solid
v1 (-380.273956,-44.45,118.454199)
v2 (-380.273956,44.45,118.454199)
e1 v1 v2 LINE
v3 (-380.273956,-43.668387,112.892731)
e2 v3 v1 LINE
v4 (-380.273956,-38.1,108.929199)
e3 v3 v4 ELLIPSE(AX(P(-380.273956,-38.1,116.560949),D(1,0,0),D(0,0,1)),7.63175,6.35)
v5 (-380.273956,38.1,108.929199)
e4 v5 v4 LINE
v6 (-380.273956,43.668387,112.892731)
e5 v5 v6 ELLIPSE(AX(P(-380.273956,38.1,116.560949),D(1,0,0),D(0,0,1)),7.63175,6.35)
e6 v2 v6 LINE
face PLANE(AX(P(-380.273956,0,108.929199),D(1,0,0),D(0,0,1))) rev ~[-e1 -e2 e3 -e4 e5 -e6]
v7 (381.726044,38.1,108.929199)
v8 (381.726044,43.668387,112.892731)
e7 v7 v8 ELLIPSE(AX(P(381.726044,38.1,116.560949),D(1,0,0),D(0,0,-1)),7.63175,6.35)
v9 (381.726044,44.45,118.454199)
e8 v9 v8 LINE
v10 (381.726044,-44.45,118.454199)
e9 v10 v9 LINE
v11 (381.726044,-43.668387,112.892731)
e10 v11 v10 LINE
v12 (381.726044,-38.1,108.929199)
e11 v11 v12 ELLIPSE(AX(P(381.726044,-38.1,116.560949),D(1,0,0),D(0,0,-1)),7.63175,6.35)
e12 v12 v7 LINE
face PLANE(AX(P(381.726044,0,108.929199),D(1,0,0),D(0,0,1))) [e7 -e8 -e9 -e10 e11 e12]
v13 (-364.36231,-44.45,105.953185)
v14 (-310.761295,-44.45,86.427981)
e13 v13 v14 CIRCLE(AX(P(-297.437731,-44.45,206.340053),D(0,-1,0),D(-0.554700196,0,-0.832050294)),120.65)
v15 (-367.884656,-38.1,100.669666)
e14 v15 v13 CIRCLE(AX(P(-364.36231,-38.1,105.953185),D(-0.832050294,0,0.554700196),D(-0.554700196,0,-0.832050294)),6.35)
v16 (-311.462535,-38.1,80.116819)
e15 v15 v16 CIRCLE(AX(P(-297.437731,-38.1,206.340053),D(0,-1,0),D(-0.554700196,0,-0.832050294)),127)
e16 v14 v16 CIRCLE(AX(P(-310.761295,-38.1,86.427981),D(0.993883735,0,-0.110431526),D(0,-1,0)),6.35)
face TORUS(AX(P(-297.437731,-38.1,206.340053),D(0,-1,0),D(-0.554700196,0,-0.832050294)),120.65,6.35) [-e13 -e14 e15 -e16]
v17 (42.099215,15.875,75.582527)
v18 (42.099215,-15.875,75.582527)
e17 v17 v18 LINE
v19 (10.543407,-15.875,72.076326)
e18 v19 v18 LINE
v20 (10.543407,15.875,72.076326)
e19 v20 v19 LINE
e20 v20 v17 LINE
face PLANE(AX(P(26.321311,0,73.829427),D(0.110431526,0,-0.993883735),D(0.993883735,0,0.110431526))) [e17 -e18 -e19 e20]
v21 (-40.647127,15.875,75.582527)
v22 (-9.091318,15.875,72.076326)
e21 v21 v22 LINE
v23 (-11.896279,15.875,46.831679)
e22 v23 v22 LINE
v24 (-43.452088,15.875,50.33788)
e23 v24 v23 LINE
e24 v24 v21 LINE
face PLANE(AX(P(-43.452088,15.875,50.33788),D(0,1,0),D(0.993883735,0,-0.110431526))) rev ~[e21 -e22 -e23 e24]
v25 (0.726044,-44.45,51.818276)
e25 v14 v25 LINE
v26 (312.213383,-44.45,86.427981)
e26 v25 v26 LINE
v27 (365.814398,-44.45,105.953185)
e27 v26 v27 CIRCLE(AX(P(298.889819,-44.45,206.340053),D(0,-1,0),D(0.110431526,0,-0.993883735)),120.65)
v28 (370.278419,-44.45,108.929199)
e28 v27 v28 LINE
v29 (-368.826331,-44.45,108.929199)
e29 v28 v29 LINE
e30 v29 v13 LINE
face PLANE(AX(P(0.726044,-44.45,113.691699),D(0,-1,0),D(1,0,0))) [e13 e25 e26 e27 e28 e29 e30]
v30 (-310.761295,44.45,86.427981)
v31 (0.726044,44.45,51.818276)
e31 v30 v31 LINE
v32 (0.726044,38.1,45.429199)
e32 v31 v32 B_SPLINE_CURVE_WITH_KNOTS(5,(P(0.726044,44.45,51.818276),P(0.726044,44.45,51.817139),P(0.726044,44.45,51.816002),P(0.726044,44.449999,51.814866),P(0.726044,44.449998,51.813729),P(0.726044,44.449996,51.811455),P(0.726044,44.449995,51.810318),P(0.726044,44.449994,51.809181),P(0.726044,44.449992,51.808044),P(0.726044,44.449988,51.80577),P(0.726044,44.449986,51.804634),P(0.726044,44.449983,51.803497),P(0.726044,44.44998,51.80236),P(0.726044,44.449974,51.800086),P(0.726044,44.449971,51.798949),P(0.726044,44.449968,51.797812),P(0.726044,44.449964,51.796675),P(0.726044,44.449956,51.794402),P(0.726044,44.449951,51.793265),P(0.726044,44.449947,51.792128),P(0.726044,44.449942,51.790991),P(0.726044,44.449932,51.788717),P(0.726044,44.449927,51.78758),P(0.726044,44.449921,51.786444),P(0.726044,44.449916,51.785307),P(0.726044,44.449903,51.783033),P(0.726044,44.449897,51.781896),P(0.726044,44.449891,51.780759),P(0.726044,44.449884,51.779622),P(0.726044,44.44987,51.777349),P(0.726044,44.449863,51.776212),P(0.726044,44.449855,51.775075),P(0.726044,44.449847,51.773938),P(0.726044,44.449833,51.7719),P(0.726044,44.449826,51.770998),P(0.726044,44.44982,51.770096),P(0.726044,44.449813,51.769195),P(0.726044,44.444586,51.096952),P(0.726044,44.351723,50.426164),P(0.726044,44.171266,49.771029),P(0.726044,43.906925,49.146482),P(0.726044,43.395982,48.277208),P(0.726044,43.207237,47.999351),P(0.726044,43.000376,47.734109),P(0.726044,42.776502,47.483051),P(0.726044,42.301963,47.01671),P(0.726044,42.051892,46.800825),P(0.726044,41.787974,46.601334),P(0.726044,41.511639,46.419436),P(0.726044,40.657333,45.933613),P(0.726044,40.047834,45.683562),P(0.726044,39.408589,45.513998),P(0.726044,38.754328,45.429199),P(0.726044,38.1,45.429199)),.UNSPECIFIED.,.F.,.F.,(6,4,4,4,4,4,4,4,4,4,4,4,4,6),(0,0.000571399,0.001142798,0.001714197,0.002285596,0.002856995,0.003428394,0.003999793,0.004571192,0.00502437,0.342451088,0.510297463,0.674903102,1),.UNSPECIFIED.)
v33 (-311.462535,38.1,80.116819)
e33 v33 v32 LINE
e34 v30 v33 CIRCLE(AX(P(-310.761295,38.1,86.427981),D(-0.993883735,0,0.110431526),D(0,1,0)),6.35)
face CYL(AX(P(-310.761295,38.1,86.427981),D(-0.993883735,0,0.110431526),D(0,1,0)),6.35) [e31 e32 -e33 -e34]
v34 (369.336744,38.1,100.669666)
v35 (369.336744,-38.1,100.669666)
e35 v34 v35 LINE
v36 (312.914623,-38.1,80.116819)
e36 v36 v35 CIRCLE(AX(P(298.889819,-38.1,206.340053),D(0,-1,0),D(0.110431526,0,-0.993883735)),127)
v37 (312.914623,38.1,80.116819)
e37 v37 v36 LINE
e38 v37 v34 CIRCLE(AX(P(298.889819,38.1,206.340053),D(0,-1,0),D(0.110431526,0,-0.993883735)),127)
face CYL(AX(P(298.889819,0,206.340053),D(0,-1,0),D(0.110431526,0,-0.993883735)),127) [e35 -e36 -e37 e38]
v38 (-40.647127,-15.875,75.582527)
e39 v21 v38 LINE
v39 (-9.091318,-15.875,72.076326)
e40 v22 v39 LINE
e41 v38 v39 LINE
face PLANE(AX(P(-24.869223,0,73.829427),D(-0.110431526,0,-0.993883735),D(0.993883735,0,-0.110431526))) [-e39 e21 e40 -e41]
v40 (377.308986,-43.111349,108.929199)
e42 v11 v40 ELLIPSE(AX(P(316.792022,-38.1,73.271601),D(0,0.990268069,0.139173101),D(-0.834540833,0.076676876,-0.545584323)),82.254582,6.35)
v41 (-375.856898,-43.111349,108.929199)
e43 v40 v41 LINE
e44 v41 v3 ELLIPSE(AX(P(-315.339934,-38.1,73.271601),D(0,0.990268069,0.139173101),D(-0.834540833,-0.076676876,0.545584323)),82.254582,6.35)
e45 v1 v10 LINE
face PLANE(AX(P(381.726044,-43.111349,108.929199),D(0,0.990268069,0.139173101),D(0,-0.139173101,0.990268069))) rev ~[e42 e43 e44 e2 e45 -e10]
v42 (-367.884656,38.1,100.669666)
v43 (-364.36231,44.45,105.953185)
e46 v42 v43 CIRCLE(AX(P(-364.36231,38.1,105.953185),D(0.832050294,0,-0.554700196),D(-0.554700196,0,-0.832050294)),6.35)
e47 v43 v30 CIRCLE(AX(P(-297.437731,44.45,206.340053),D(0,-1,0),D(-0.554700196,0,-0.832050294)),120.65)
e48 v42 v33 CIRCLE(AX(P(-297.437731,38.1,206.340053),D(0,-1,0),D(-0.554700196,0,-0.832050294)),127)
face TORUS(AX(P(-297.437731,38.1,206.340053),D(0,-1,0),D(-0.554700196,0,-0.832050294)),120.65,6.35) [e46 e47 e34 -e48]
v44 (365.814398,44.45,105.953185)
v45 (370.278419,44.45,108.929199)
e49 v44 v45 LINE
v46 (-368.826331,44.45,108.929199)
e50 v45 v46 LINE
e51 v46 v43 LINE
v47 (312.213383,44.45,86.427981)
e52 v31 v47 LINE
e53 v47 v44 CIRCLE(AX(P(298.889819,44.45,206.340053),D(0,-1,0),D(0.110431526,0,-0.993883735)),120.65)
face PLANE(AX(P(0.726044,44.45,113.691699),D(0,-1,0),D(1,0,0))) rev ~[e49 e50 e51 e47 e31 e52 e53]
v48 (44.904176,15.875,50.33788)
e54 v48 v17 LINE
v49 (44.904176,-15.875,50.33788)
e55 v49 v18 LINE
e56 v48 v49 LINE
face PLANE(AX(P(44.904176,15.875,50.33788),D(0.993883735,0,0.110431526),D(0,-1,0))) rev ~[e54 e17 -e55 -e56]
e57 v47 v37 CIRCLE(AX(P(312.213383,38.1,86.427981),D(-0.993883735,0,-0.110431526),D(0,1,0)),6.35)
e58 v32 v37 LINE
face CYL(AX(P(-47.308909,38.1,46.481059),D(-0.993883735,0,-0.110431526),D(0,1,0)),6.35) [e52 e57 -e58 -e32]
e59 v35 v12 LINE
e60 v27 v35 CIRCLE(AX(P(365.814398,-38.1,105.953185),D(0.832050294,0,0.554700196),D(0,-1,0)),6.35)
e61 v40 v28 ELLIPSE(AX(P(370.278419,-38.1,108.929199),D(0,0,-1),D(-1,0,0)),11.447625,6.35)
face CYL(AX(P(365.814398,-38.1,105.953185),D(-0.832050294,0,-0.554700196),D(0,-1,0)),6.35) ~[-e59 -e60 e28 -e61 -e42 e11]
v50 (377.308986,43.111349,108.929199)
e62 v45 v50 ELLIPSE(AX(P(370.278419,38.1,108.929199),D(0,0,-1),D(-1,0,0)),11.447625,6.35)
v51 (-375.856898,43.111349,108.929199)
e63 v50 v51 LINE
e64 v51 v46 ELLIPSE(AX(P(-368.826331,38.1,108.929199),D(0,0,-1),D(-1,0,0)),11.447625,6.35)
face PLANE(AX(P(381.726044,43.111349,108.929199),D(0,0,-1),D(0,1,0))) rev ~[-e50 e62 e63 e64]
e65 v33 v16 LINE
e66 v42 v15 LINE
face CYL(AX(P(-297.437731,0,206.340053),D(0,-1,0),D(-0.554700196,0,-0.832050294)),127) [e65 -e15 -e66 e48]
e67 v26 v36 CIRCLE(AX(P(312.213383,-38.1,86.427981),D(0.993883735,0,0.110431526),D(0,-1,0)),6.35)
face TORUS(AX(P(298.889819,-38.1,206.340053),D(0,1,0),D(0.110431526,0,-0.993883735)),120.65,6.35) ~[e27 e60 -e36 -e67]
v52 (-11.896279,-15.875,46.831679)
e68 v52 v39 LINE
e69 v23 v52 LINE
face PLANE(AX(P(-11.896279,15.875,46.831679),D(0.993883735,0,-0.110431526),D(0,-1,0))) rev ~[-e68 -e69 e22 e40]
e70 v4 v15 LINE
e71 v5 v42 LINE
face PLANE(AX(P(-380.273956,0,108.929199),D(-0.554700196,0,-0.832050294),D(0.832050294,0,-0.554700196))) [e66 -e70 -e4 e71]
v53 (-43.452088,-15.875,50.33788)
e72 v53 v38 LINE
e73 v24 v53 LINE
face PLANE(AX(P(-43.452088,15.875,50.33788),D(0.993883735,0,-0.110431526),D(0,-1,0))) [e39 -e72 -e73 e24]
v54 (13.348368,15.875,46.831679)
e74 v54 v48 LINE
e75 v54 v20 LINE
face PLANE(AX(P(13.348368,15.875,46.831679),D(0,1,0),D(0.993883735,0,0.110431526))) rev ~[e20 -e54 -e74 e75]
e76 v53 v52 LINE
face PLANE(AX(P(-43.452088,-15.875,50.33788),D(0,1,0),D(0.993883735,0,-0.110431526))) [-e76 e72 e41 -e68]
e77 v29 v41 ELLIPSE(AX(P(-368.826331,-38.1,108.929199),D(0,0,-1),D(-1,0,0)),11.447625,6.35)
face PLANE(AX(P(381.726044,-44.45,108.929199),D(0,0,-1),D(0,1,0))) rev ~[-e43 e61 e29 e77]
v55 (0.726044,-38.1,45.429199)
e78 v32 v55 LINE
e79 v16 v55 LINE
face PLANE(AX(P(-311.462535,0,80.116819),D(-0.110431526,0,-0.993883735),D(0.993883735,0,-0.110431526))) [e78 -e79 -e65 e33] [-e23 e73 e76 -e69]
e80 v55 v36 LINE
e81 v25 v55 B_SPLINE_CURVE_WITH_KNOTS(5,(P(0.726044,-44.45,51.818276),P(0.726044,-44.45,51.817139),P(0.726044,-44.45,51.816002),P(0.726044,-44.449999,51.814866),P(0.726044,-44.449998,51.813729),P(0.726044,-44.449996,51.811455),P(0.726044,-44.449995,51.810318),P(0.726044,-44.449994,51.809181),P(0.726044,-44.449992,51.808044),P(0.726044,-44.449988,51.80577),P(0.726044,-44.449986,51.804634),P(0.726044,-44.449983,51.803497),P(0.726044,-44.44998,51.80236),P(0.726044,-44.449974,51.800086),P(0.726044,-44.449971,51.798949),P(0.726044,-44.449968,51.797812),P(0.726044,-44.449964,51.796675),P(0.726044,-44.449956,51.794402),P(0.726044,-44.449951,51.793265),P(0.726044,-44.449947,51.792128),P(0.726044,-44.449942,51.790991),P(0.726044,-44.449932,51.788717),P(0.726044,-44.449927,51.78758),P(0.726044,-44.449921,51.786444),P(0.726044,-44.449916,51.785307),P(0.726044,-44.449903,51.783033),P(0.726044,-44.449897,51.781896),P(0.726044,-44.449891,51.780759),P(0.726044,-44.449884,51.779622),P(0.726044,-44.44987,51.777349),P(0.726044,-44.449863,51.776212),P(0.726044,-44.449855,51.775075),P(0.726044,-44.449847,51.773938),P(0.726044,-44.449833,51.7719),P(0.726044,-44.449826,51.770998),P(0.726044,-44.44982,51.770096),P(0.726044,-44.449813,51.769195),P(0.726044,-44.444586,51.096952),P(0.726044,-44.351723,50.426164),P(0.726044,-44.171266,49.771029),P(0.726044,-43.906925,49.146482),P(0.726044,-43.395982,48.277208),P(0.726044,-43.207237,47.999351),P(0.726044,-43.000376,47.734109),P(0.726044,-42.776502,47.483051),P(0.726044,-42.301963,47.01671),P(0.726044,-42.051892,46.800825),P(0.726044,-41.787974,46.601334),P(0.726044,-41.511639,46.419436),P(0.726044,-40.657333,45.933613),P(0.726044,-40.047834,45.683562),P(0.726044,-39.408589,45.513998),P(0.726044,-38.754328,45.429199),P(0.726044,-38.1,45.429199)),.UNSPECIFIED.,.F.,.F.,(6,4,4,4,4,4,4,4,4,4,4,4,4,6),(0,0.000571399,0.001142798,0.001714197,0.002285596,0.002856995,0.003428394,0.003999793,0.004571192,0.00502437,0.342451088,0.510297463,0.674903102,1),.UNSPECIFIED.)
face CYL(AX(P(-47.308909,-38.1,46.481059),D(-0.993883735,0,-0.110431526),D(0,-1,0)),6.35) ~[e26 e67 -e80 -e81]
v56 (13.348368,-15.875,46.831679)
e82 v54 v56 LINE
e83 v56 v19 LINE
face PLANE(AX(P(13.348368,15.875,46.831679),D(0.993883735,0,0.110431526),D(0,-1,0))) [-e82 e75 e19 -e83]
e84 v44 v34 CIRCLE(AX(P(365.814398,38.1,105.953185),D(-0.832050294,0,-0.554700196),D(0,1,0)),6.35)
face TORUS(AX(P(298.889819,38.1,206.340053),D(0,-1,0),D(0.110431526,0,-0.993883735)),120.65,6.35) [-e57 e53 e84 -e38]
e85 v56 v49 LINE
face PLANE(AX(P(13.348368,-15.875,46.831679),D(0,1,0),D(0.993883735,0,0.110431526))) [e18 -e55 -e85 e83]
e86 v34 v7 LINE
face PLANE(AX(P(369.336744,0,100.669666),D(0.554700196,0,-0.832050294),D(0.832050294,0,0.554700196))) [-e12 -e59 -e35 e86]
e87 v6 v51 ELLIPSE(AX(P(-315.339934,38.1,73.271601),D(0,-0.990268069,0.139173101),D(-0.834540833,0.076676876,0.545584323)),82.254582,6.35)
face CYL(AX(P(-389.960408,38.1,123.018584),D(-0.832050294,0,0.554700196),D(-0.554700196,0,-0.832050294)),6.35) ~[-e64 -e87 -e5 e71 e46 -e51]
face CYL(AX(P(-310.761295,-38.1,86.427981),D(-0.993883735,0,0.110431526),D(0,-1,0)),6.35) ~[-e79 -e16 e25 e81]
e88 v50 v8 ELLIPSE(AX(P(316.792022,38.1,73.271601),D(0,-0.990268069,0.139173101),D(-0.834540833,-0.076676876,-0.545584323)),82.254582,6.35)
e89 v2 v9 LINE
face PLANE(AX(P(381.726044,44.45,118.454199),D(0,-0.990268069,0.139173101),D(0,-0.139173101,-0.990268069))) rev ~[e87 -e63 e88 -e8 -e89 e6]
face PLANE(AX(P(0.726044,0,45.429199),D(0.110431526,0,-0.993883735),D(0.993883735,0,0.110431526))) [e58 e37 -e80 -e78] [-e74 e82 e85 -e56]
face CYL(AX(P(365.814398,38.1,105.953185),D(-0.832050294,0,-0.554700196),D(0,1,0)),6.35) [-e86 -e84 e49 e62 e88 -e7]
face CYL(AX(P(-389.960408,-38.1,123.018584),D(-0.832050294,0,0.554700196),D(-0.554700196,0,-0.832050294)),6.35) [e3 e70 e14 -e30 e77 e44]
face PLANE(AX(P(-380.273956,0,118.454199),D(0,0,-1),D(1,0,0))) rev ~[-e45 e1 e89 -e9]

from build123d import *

# Parameters (mm, degrees)
F0_W          = 762
F0_H          = 9.525
F1_DEPTH      = 44.45
F2_W          = 31.75
F2_H          = 31.75
F3_DEPTH      = 25.4
F4_W          = 31.75
F4_H          = 31.75
F5_DEPTH      = 25.4
F7_DEPTH      = 762.001
F9_DEPTH      = 762.001
F10_T1_DEPTH  = 361.7347577498
F10_T3_DEPTH  = 361.7347577498
F10_T5_DEPTH  = 30.7650851852
F10_T7_DEPTH  = 30.7650851852
F10_T10_ANGLE = 27.3498757801
F10_T12_ANGLE = 27.3498757801
F10_T14_ANGLE = 27.3498757801
F10_T16_ANGLE = 27.3498757801


# Not quite as in the source:
# - a fillet or chamfer that OpenCascade refuses, or shapes differently, is made with other operations: its cross-section is extruded or revolved along the edge and cut away or added
# - a feature names something its author has since deleted; it is built from what else it names


with BuildPart() as f1:
    # F0 (on Front) → F1 (new body, symmetric)
    with BuildSketch(Plane.XZ):
        with Locations((0.726044178, 113.6916989031)):
            Rectangle(F0_W, F0_H)
        with BuildLine():
            Line((381.726044178, 108.9291989031), (-380.273955822, 108.9291989031))
            Line((-380.273955822, 108.9291989031), (-367.8846560609, 100.669665729))
            ThreePointArc((-367.8846560609, 100.669665729), (-340.9058012367, 87.0105643735), (-311.4625349518, 80.1168188064))
            Line((-311.4625349518, 80.1168188064), (0.726044178, 45.4291989031))
            Line((0.726044178, 45.4291989031), (31.5534211464, 48.8544630107))
            Line((31.5534211464, 48.8544630107), (312.9146233078, 80.1168188064))
            ThreePointArc((312.9146233078, 80.1168188064), (342.3578895927, 87.0105643735), (369.3367444169, 100.669665729))
            Line((369.3367444169, 100.669665729), (381.726044178, 108.9291989031))
        make_face()
    extrude(amount=F1_DEPTH, both=True)

    # F2 (on face) → F3 (cut)
    with BuildSketch(Plane(origin=(4.9949857842, 0, 44.954872058), x_dir=(0.9938837347, 0, -0.1104315261), z_dir=(-0.1104315261, 0, -0.9938837347))):
        with Locations((-32.870212264, 0)):
            Rectangle(F2_W, F2_H)
    extrude(amount=-F3_DEPTH, mode=Mode.SUBTRACT)

    # F4 (on face) → F5 (cut)
    with BuildSketch(Plane(origin=(-4.9772773896, 0, 44.7954965067), x_dir=(0.9938837347, 0, 0.1104315261), z_dir=(0.1104315261, 0, -0.9938837347))):
        with Locations((34.3134192624, 0)):
            Rectangle(F4_W, F4_H)
    extrude(amount=-F5_DEPTH, mode=Mode.SUBTRACT)

    # F6 (on face) → F7 (cut, through all)
    with BuildSketch(Plane.YZ.offset(381.726044178)):
        Polygon((-43.1113485495, 108.9291989031), (-44.45, 118.4541989031), (-44.45, 108.9291989031), align=None)
    extrude(amount=-F7_DEPTH, mode=Mode.SUBTRACT)

    # F8 (on face) → F9 (cut, through all)
    with BuildSketch(Plane.YZ.offset(381.726044178)):
        Polygon((44.45, 108.9291989031), (44.45, 118.4541989031), (43.1113485495, 108.9291989031), align=None)
    extrude(amount=-F9_DEPTH, mode=Mode.SUBTRACT)

    # F10: fillet of radius 6.35 on 4 edges, made by hand

    # F10_s2 → F10_t1 (cut)
    with BuildSketch(Plane(origin=(-316.457520736, 0, 35.1619467484), x_dir=(0, 1, 0), z_dir=(0.9938837347, 0, -0.1104315261))):
        with BuildLine():
            ThreePointArc((-44.45, 51.5815200356), (-42.5901280605, 47.0913919751), (-38.1, 45.2315200356))
            Line((-38.1, 45.2315200356), (-44.45, 45.2315200356))
            Line((-44.45, 45.2315200356), (-44.45, 51.5815200356))
        make_face()
        with BuildLine():
            ThreePointArc((44.45, 51.5815200356), (42.5901280605, 47.0913919751), (38.1, 45.2315200356))
            Line((38.1, 45.2315200356), (44.45, 45.2315200356))
            Line((44.45, 45.2315200356), (44.45, 51.5815200356))
        make_face()
    extrude(amount=F10_T1_DEPTH, mode=Mode.SUBTRACT)

    # F10_s4 → F10_t3 (cut)
    with BuildSketch(Plane(origin=(-41.6303912962, 0, -4.6255990329), x_dir=(0, 1, 0), z_dir=(0.9938837347, 0, 0.1104315261))):
        with BuildLine():
            ThreePointArc((-44.45, 51.4211637025), (-42.5901280605, 46.9310356419), (-38.1, 45.0711637025))
            Line((-38.1, 45.0711637025), (-44.45, 45.0711637025))
            Line((-44.45, 45.0711637025), (-44.45, 51.4211637025))
        make_face()
        with BuildLine():
            ThreePointArc((44.45, 51.4211637025), (42.5901280605, 46.9310356419), (38.1, 45.0711637025))
            Line((38.1, 45.0711637025), (44.45, 45.0711637025))
            Line((44.45, 45.0711637025), (44.45, 51.4211637025))
        make_face()
    extrude(amount=F10_T3_DEPTH, mode=Mode.SUBTRACT)

    # F10_s6 → F10_t5 (cut)
    with BuildSketch(Plane(origin=(-326.7503981008, 0, 217.8335987339), x_dir=(0, 1, 0), z_dir=(0.8320502943, 0, -0.5547001962))):
        with BuildLine():
            ThreePointArc((38.1, -120.3034659045), (42.5901280605, -118.443593965), (44.45, -113.9534659045))
            Line((44.45, -113.9534659045), (44.45, -120.3034659045))
            Line((44.45, -120.3034659045), (38.1, -120.3034659045))
        make_face()
        with BuildLine():
            ThreePointArc((-38.1, -120.3034659045), (-42.5901280605, -118.443593965), (-44.45, -113.9534659045))
            Line((-44.45, -113.9534659045), (-44.45, -120.3034659045))
            Line((-44.45, -120.3034659045), (-38.1, -120.3034659045))
        make_face()
    extrude(amount=F10_T5_DEPTH, mode=Mode.SUBTRACT)

    # F10_s8 → F10_t7 (cut)
    with BuildSketch(Plane(origin=(302.1575918559, 0, 201.4383945706), x_dir=(0, 1, 0), z_dir=(0.8320502943, 0, 0.5547001962))):
        with BuildLine():
            ThreePointArc((44.45, -114.7589396005), (42.5901280605, -119.2490676611), (38.1, -121.1089396005))
            Line((38.1, -121.1089396005), (44.45, -121.1089396005))
            Line((44.45, -121.1089396005), (44.45, -114.7589396005))
        make_face()
        with BuildLine():
            ThreePointArc((-44.45, -114.7589396005), (-42.5901280605, -119.2490676611), (-38.1, -121.1089396005))
            Line((-38.1, -121.1089396005), (-44.45, -121.1089396005))
            Line((-44.45, -121.1089396005), (-44.45, -114.7589396005))
        make_face()
    extrude(amount=F10_T7_DEPTH, mode=Mode.SUBTRACT)

    # F10_s9 → F10_t10 (revolve, cut)
    with BuildSketch(Plane(origin=(-301.1522999171, 0, 200.7681999448), x_dir=(0, 1, 0), z_dir=(-0.8320502943, 0, 0.5547001962))):
        with BuildLine():
            ThreePointArc((44.45, 113.9534659045), (42.5901280605, 118.443593965), (38.1, 120.3034659045))
            Line((38.1, 120.3034659045), (44.45, 120.3034659045))
            Line((44.45, 120.3034659045), (44.45, 113.9534659045))
        make_face()
    revolve(axis=Axis((-297.4377311403, 44.45, 206.34005311), (0, -1, 0)), revolution_arc=F10_T10_ANGLE, mode=Mode.SUBTRACT)

    # F10_s11 → F10_t12 (revolve, cut)
    with BuildSketch(Plane(origin=(317.8919006975, 0, 35.3213222997), x_dir=(0, 1, 0), z_dir=(-0.9938837347, 0, -0.1104315261))):
        with BuildLine():
            ThreePointArc((44.45, -51.4211637025), (42.5901280605, -46.9310356419), (38.1, -45.0711637025))
            Line((38.1, -45.0711637025), (44.45, -45.0711637025))
            Line((44.45, -45.0711637025), (44.45, -51.4211637025))
        make_face()
    revolve(axis=Axis((298.8898194963, 44.45, 206.34005311), (0, -1, 0)), revolution_arc=F10_T12_ANGLE, mode=Mode.SUBTRACT)

    # F10_s13 → F10_t14 (revolve, cut)
    with BuildSketch(Plane(origin=(317.8919006975, 0, 35.3213222997), x_dir=(0, 1, 0), z_dir=(-0.9938837347, 0, -0.1104315261))):
        with BuildLine():
            ThreePointArc((-44.45, -51.4211637025), (-42.5901280605, -46.9310356419), (-38.1, -45.0711637025))
            Line((-38.1, -45.0711637025), (-44.45, -45.0711637025))
            Line((-44.45, -45.0711637025), (-44.45, -51.4211637025))
        make_face()
    revolve(axis=Axis((298.8898194963, -44.45, 206.34005311), (0, -1, 0)), revolution_arc=F10_T14_ANGLE, mode=Mode.SUBTRACT)

    # F10_s15 → F10_t16 (revolve, cut)
    with BuildSketch(Plane(origin=(-301.1522999171, 0, 200.7681999448), x_dir=(0, 1, 0), z_dir=(-0.8320502943, 0, 0.5547001962))):
        with BuildLine():
            ThreePointArc((-38.1, 120.3034659045), (-42.5901280605, 118.443593965), (-44.45, 113.9534659045))
            Line((-44.45, 113.9534659045), (-44.45, 120.3034659045))
            Line((-44.45, 120.3034659045), (-38.1, 120.3034659045))
        make_face()
    revolve(axis=Axis((-297.4377311403, -44.45, 206.34005311), (0, -1, 0)), revolution_arc=F10_T16_ANGLE, mode=Mode.SUBTRACT)


solid = f1.part
